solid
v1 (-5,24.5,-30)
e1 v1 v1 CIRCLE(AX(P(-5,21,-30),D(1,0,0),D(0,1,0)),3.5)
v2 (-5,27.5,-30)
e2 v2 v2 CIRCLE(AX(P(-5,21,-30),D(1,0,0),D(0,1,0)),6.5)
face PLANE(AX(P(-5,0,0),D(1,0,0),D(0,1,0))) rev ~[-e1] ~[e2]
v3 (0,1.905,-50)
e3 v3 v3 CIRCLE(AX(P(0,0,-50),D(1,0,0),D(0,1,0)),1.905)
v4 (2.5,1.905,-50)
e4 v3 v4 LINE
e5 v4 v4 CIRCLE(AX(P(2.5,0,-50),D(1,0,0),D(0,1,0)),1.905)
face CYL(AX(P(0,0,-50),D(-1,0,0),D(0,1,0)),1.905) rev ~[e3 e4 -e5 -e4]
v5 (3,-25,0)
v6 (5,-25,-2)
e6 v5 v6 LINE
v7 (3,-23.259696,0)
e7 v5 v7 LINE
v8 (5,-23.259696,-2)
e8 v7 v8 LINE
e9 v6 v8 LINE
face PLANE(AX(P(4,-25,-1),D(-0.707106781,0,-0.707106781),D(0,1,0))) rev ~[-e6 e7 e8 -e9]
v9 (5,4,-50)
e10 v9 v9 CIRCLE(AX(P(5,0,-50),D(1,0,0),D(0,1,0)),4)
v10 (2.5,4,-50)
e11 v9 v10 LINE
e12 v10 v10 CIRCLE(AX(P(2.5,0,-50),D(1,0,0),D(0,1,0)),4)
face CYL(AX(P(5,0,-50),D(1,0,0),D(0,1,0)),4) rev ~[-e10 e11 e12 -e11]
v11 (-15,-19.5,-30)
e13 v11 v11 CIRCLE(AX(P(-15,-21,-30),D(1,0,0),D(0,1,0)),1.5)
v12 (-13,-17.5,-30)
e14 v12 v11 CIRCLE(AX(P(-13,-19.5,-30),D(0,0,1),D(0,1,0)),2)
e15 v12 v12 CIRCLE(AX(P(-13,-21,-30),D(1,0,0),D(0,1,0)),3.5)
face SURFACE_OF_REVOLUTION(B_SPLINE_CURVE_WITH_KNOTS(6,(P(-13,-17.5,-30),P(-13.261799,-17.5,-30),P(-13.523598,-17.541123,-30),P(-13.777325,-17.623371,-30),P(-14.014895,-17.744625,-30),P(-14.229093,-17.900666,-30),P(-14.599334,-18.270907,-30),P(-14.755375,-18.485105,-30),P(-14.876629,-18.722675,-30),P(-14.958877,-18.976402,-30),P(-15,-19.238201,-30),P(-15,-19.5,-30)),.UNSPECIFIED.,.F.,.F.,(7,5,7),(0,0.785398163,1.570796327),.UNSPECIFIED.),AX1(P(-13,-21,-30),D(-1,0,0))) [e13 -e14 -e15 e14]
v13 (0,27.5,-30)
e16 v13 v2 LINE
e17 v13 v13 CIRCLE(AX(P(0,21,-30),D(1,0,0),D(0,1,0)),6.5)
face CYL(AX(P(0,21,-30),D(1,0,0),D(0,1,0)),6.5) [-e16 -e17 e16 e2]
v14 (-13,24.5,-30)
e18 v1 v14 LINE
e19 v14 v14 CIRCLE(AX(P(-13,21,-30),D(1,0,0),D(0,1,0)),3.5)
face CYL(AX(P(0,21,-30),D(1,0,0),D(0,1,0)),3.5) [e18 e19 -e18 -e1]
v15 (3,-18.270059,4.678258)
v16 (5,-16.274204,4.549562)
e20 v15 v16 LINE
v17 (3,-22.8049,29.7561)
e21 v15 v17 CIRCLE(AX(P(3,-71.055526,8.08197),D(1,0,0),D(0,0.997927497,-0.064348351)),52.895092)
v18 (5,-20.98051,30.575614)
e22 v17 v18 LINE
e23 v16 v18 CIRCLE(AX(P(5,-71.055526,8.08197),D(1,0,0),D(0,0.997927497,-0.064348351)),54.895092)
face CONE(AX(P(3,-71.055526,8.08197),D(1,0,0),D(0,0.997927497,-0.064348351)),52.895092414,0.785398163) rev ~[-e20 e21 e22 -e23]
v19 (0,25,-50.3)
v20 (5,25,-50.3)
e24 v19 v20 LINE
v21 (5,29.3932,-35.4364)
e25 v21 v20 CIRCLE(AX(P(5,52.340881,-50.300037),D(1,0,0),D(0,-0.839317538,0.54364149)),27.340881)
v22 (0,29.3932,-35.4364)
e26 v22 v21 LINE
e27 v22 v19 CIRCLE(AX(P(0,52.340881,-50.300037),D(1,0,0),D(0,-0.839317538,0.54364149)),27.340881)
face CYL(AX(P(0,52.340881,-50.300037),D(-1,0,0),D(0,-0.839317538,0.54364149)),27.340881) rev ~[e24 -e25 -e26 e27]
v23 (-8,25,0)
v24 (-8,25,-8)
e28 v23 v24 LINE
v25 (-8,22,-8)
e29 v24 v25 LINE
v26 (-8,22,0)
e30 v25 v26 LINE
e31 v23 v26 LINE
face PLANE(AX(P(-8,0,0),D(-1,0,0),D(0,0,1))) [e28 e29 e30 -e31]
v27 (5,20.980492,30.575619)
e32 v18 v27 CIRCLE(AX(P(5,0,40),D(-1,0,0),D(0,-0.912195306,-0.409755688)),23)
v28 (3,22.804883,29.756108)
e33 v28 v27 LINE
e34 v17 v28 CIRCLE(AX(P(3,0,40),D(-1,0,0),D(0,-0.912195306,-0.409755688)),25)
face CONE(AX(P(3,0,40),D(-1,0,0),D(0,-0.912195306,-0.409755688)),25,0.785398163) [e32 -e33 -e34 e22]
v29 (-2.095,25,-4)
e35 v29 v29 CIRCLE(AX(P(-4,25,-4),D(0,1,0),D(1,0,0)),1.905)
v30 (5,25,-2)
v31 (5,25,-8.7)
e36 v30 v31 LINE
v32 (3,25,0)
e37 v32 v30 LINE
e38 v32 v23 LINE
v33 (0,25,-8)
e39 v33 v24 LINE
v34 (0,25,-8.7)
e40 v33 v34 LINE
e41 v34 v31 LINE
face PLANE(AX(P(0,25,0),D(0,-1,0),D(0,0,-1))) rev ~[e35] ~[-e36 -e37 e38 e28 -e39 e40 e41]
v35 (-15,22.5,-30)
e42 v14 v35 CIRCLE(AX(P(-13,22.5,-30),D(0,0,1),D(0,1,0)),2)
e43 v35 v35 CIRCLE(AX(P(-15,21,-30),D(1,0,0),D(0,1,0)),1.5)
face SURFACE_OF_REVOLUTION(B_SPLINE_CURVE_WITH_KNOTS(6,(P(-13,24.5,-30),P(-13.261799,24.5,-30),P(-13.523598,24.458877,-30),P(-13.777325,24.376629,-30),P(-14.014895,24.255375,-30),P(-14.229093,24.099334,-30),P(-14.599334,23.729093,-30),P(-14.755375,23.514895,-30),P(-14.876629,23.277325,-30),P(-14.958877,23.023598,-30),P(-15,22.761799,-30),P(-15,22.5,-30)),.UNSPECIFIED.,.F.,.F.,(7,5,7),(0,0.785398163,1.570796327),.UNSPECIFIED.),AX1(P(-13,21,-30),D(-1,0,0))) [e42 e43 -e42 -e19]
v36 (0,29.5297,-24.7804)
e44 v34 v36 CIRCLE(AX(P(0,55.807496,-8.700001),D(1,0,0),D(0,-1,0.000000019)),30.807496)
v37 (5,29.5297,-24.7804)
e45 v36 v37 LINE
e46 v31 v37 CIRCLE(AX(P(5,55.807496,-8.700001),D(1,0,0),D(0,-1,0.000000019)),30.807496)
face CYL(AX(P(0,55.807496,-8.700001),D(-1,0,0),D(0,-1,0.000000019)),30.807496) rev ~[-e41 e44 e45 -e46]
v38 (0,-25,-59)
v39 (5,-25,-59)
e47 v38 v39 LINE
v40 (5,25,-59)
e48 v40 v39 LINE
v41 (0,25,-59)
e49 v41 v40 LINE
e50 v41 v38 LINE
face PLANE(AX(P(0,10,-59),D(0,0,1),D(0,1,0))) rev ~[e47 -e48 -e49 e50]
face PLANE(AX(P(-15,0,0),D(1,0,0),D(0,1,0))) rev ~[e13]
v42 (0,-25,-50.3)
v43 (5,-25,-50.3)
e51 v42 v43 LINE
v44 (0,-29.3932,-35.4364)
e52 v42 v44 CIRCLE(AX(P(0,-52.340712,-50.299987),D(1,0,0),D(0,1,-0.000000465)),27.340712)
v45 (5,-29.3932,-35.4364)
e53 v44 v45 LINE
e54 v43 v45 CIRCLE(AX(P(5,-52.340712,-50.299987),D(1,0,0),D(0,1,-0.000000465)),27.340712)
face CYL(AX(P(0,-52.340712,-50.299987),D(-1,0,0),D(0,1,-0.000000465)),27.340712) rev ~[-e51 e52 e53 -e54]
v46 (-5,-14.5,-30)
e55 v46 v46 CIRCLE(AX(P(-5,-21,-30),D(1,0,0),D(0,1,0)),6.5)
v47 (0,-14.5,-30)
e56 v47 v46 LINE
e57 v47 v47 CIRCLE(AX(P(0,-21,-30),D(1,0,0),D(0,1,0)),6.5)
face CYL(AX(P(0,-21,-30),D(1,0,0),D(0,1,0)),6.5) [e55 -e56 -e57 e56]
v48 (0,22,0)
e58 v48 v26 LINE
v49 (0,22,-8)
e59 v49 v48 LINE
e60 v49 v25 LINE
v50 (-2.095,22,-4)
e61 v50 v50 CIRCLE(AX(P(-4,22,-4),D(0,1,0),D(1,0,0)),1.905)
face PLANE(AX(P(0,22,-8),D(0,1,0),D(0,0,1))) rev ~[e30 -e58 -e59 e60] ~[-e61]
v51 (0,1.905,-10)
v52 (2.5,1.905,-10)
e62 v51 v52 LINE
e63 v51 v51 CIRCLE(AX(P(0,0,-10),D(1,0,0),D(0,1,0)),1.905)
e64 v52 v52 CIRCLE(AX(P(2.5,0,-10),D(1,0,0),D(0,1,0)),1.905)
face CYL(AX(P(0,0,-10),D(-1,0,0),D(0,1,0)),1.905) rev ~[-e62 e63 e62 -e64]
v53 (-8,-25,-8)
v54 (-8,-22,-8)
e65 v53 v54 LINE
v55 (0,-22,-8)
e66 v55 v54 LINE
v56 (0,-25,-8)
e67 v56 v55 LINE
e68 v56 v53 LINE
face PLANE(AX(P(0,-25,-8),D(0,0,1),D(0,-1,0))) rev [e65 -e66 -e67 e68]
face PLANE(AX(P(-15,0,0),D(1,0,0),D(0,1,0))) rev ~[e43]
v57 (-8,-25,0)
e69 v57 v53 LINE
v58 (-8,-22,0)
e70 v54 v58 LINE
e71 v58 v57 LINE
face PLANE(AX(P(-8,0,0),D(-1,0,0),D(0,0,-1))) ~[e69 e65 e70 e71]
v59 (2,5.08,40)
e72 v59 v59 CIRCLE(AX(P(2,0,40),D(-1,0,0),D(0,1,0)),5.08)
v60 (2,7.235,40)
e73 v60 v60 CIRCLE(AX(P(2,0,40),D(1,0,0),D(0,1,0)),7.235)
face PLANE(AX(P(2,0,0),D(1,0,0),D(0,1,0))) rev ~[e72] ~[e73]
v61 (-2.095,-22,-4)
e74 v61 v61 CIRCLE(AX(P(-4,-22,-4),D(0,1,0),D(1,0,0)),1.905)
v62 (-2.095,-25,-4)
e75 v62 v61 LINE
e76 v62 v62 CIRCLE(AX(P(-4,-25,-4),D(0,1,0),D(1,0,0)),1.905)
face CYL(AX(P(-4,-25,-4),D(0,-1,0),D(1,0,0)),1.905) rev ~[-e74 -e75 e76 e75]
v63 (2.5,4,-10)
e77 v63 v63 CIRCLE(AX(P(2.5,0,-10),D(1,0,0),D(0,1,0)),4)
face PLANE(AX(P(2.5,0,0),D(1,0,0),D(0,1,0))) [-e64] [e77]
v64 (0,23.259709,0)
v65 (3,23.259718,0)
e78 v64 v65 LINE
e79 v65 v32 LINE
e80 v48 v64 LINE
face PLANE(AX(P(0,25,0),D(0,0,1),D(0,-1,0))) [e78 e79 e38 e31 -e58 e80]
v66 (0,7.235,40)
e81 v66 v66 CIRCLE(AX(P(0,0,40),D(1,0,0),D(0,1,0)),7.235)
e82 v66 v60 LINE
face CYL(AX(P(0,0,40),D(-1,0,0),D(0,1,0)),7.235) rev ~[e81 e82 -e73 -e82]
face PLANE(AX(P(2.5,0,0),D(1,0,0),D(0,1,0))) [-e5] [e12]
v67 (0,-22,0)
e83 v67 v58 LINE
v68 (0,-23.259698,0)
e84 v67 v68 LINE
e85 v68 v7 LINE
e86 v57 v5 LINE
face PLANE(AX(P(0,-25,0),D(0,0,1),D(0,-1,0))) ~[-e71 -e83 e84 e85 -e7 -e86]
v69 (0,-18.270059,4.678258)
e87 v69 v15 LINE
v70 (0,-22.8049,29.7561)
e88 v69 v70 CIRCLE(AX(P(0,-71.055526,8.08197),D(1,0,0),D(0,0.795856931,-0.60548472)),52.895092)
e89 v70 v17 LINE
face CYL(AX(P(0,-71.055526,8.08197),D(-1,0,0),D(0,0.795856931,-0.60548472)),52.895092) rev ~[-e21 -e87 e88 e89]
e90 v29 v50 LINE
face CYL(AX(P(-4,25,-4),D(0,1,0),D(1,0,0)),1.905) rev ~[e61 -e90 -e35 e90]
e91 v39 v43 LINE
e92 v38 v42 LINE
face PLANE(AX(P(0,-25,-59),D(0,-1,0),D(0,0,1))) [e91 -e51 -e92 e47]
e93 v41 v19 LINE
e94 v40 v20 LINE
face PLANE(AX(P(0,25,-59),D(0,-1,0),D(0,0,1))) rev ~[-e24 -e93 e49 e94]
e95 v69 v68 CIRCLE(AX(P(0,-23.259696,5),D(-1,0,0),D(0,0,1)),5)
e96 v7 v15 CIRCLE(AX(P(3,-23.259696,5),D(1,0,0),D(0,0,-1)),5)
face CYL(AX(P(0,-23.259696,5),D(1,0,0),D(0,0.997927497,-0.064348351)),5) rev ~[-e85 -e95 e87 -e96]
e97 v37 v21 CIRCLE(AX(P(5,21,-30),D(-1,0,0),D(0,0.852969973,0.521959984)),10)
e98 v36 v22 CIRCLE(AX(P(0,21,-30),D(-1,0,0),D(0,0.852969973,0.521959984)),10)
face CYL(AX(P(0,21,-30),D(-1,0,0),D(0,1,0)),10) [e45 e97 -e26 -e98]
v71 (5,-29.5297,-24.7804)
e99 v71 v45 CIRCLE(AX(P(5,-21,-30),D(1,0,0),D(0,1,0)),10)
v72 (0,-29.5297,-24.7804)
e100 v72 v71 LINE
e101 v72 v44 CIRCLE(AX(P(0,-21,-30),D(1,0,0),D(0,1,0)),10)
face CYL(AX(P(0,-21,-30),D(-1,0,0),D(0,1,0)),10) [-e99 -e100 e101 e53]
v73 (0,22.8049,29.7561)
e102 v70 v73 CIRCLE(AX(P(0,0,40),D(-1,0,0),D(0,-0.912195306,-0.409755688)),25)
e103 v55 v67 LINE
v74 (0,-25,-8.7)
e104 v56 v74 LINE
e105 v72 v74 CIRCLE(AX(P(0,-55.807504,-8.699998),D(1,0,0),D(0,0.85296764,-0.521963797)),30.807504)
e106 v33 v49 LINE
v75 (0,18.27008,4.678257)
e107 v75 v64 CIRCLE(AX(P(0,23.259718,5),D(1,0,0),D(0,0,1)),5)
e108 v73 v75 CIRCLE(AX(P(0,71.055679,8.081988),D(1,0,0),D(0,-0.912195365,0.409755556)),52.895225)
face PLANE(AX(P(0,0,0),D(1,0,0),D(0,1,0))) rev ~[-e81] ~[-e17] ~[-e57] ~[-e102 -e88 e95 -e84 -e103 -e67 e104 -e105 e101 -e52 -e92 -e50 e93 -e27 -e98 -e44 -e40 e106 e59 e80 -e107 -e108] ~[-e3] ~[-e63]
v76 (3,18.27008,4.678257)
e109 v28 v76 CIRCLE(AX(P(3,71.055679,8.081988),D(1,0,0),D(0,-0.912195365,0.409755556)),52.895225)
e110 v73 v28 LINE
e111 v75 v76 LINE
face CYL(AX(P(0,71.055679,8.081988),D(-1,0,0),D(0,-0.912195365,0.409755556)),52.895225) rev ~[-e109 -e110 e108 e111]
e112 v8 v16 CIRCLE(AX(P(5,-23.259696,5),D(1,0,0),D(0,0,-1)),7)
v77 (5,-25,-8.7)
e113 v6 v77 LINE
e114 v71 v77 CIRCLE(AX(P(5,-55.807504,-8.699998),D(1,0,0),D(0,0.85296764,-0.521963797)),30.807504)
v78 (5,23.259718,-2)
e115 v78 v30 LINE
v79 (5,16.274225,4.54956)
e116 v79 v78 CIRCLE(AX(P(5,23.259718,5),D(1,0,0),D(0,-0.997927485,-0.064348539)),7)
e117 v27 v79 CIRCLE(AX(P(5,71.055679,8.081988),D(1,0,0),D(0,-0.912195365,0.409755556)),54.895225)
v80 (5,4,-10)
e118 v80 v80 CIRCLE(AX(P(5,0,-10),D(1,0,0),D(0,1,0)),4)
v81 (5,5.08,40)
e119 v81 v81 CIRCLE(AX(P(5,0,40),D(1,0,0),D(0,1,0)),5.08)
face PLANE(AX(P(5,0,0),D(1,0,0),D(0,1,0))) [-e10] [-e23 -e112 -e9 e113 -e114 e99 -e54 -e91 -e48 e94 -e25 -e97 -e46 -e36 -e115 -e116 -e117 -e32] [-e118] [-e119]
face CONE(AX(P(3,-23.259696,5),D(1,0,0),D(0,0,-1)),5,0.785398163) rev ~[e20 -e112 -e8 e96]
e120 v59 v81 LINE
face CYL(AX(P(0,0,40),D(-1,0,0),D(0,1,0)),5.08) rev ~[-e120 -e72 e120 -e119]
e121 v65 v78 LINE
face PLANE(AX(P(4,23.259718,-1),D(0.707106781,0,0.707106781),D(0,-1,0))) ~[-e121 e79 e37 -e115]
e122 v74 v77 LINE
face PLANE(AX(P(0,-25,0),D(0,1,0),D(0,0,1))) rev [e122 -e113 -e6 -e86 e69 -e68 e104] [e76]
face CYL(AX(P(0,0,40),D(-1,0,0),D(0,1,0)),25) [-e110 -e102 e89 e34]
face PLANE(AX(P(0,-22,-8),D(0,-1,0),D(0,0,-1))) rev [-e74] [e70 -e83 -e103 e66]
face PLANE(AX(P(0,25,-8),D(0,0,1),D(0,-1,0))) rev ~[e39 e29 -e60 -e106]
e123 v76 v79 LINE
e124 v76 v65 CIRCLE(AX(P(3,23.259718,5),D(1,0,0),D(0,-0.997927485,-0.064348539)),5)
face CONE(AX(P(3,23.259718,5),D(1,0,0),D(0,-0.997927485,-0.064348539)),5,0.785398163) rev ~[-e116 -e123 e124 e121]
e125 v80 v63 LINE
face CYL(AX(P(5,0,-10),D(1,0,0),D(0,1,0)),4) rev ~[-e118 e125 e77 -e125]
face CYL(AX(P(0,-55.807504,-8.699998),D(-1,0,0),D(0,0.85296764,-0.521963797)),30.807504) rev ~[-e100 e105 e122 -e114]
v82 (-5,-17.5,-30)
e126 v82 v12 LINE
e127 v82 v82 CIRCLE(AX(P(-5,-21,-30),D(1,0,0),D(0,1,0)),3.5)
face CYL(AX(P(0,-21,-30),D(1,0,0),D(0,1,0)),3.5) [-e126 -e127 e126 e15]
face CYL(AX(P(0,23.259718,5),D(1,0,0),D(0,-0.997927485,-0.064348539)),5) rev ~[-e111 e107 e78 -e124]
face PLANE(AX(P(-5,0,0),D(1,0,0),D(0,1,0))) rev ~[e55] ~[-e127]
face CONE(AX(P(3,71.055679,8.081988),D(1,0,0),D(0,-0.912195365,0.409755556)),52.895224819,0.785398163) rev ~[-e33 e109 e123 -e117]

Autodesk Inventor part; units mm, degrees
ref_plane "YZ Plane" through (0, 0, 0) normal (1, 0, 0) x (0, 1, 0)
ref_plane "XZ Plane" through (0, 0, 0) normal (0, 1, 0) x (-1, 0, 0)
ref_plane "XY Plane" through (0, 0, 0) normal (0, 0, 1) x (1, 0, 0)
sketch "Sketch1" plane through (0, 0, 0) normal (1, 0, 0) x (0, 1, 0)
  line L0 (0, 0) -> (0, -10) construction
  line L1 (0, -10) -> (0, -50) construction
  circle A0 centre (0, -10) radius 1.905
  circle A1 centre (0, -50) radius 1.905
  line L2 (10, 0) -> (10, -59)
  line L3 (10, -59) -> (0, -59)
  line L4 (0, -59) -> (-10, -59)
  line L5 (-10, -59) -> (-10, 0)
  line L6 (0, 0) -> (10, 0)
  line L7 (0, 0) -> (-10, 0)
  line L8 (0, -50) -> (0, -59) construction
  circle A2 centre (0, 40) radius 25
  line L9 (10, 0) -> (10, 10)
  line L10 (10, 10) -> (-10, 10)
  line L11 (-10, 10) -> (-10, 0)
  arc A3 (22.8049, 29.7561) -> (10, -30) centre (155.8333, -30) ccw
  arc A4 (-10, -30) -> (-22.8049, 29.7561) centre (-155.8333, -30) ccw
  line L12 (0, -30) -> (21, -30) construction
  line L13 (0, -30) -> (-21, -30) construction
  circle A5 centre (21, -30) radius 3.5
  circle A6 centre (-21, -30) radius 3.5
  circle A7 centre (21, -30) radius 10
  circle A8 centre (-21, -30) radius 10
  circle A9 centre (21, -30) radius 6.5
  circle A10 centre (-21, -30) radius 6.5
  line L14 (-10, -59) -> (-25, -59)
  line L15 (10, -59) -> (25, -59)
  arc A11 (-28.9586, -23.9452) -> (-22.8049, 29.7561) centre (-71.0556, 8.082) ccw
  arc A12 (22.8049, 29.7561) -> (28.9586, -23.9452) centre (71.0556, 8.082) ccw
  line L16 (0, 0) -> (15, 0)
  line L17 (10, 0) -> (25, 0)
  line L18 (25, -59) -> (25, -50.3)
  arc A13 (29.3932, -35.4364) -> (25, -50.3) centre (52.3408, -50.3) ccw
  line L19 (25, 0) -> (25, -8.7)
  arc A14 (25, -8.7) -> (29.5297, -24.7804) centre (55.8075, -8.7) ccw
  line L20 (-10, 0) -> (-25, 0)
  line L21 (-25, -59) -> (-25, -50.3)
  arc A15 (-25, -50.3) -> (-29.3932, -35.4364) centre (-52.3408, -50.3) ccw
  line L22 (-25, 0) -> (-25, -8.7)
  arc A16 (-29.5297, -24.7804) -> (-25, -8.7) centre (-55.8075, -8.7) ccw
  circle A17 centre (0, -50) radius 4
  circle A18 centre (0, -10) radius 4
  circle A19 centre (0, 40) radius 7.235
  circle A20 centre (0, 40) radius 5.08
  point P0 (-10, -30)
  point P1 (10, -30)
  point P2 (23.8246, -39.5928)
  point P3 (10, -63.336)
  point P4 (-30.2308, -33.8462)
  point P5 (28.9586, -23.9452)
  point P6 (22.8049, 29.7561)
  point P7 (30.2308, -26.1538)
  point P8 (18.7815, 0)
  point P9 (-18.7815, 0)
  point P10 (-13.1191, 0)
  point P11 (-29.3932, -35.4364)
  dimension "d0" = 3.81
  dimension "d1" = 3.81
  dimension "d2" = 40
  dimension "d3" = 10
  dimension "d5" = 9
  dimension "d7" = 10
  dimension "d8" = 10
  dimension "d9" = 50
  dimension "d12" = 30
  dimension "d13" = 10
  dimension "d14" = 20
  dimension "d30" = 21
  dimension "d31" = 7
  dimension "d32" = 7
  dimension "d33" = 20
  dimension "d34" = 20
  dimension "d38" = 3
  dimension "d48" = 15
  dimension "d55" = 15
  dimension "d56" = 8.7
  dimension "d57" = 8.7
  dimension "d58" = 15
  dimension "d134" = 8
  dimension "d135" = 8
  dimension "d138" = 14.47
  dimension "d157" = 10.16
extrude "Extrusion1" add sketch "Sketch1" along normal blind 5 contours L16 A3 L2 | L2 L3 L4 L5 L7 L6 | L6 L7 L11 L10 L9 | L9 L10 L11 L20 A4 A2 A3 L16 | A3 L16 L17 A12 A7 A13 L18 L15 L2 | A3 A12 L17 L16 | L5 A4 L20 | A2 | L5 L14 L21 A15 A8 A11 L20 A4 | L20 A11 A4 | L17 L19 A14 A7 A12 | A11 A8 A16 L22 L20 | A7 | A8 | A5 | A6 | A9 | A10 | A17 | A18 | A19 | A20
fillet "Face Fillet1" radius 5 1 edges at (2.5, -18.7815, 0)
fillet "Face Fillet2" radius 5 1 edges at (2.5, 18.7815, 0)
extrude "Extrusion16" cut sketch "Sketch1" along normal up to surface (5 mm away) contours A20
extrude "Extrusion17" cut sketch "Sketch1" along normal blind 2 from surface at 0 contours A19 | A20
extrude "Extrusion11" cut sketch "Sketch1" against normal blind 2.5 from surface at 5 contours A17 | A18
extrude "Extrusion19" add sketch "Sketch1" against normal blind 15 contours A5 | A6
extrude "Extrusion20" add sketch "Sketch1" against normal blind 5 contours A9 | A10
fillet "Fillet4" radius 2 2 edges at (-15, 17.5, -30) (-15, -24.5, -30)
chamfer "Chamfer2" distance 2 angle 45 7 edges at (5, 0, 65) (5, -19.0046, 17.4944) (5, -19.8398, 1.3525) (5, -24.1298, 0) (5, 19.0046, 17.4944) (5, 19.8398, 1.3525) (5, 24.1298, 0)
sketch "Sketch15" plane through (0, 0, 0) normal (-1, 0, 0) x (0, 0, 1)
  line L0 (0, 25) -> (0, 23.2597) projected
  line L1 (0, 25) -> (-8, 25)
  line L2 (-8, 25) -> (-8, 22)
  line L3 (-8, 22) -> (0, 22)
  line L4 (0, 22) -> (0, 25)
  point P0 (0, 0)
  dimension "d175" = 8
  dimension "d176" = 3
extrude "Extrusion21" add sketch "Sketch15" along normal blind 8
sketch "Sketch16" plane through (0, 25, -8.7) normal (0, 1, 0) x (1, 0, 0)
  circle A0 centre (-4, -4.7) radius 1.905
  line L0 (-8, -8.7) -> (-8, -0.7) projected
  line L1 (-8, -8.7) -> (3, -8.7) projected
  point P0 (0, -8.7)
  dimension "d179" = 3.81
  dimension "d180" = 4
  dimension "d181" = 4
extrude "Extrusion22" cut sketch "Sketch16" against normal up to surface (3 mm away)
mirror "Mirror2" about plane through (0, 0, 0) normal (0, 1, 0) of "Extrusion22", "Extrusion21"
equation "\"d0\" = M4_HOLE_D"
equation "\"d1\" = d0"
equation "\"d14\" = 0.5 * d2"
equation "\"d32\" = d31"
equation "\"d34\" = d33"
equation "\"M4_HOLE_D\" = 3.81"
equation "\"M3_HOLE_D\" = 2.54"
equation "\"d88\" = 3"
properties part number "bldc_arm" material "ABS Plastic"
